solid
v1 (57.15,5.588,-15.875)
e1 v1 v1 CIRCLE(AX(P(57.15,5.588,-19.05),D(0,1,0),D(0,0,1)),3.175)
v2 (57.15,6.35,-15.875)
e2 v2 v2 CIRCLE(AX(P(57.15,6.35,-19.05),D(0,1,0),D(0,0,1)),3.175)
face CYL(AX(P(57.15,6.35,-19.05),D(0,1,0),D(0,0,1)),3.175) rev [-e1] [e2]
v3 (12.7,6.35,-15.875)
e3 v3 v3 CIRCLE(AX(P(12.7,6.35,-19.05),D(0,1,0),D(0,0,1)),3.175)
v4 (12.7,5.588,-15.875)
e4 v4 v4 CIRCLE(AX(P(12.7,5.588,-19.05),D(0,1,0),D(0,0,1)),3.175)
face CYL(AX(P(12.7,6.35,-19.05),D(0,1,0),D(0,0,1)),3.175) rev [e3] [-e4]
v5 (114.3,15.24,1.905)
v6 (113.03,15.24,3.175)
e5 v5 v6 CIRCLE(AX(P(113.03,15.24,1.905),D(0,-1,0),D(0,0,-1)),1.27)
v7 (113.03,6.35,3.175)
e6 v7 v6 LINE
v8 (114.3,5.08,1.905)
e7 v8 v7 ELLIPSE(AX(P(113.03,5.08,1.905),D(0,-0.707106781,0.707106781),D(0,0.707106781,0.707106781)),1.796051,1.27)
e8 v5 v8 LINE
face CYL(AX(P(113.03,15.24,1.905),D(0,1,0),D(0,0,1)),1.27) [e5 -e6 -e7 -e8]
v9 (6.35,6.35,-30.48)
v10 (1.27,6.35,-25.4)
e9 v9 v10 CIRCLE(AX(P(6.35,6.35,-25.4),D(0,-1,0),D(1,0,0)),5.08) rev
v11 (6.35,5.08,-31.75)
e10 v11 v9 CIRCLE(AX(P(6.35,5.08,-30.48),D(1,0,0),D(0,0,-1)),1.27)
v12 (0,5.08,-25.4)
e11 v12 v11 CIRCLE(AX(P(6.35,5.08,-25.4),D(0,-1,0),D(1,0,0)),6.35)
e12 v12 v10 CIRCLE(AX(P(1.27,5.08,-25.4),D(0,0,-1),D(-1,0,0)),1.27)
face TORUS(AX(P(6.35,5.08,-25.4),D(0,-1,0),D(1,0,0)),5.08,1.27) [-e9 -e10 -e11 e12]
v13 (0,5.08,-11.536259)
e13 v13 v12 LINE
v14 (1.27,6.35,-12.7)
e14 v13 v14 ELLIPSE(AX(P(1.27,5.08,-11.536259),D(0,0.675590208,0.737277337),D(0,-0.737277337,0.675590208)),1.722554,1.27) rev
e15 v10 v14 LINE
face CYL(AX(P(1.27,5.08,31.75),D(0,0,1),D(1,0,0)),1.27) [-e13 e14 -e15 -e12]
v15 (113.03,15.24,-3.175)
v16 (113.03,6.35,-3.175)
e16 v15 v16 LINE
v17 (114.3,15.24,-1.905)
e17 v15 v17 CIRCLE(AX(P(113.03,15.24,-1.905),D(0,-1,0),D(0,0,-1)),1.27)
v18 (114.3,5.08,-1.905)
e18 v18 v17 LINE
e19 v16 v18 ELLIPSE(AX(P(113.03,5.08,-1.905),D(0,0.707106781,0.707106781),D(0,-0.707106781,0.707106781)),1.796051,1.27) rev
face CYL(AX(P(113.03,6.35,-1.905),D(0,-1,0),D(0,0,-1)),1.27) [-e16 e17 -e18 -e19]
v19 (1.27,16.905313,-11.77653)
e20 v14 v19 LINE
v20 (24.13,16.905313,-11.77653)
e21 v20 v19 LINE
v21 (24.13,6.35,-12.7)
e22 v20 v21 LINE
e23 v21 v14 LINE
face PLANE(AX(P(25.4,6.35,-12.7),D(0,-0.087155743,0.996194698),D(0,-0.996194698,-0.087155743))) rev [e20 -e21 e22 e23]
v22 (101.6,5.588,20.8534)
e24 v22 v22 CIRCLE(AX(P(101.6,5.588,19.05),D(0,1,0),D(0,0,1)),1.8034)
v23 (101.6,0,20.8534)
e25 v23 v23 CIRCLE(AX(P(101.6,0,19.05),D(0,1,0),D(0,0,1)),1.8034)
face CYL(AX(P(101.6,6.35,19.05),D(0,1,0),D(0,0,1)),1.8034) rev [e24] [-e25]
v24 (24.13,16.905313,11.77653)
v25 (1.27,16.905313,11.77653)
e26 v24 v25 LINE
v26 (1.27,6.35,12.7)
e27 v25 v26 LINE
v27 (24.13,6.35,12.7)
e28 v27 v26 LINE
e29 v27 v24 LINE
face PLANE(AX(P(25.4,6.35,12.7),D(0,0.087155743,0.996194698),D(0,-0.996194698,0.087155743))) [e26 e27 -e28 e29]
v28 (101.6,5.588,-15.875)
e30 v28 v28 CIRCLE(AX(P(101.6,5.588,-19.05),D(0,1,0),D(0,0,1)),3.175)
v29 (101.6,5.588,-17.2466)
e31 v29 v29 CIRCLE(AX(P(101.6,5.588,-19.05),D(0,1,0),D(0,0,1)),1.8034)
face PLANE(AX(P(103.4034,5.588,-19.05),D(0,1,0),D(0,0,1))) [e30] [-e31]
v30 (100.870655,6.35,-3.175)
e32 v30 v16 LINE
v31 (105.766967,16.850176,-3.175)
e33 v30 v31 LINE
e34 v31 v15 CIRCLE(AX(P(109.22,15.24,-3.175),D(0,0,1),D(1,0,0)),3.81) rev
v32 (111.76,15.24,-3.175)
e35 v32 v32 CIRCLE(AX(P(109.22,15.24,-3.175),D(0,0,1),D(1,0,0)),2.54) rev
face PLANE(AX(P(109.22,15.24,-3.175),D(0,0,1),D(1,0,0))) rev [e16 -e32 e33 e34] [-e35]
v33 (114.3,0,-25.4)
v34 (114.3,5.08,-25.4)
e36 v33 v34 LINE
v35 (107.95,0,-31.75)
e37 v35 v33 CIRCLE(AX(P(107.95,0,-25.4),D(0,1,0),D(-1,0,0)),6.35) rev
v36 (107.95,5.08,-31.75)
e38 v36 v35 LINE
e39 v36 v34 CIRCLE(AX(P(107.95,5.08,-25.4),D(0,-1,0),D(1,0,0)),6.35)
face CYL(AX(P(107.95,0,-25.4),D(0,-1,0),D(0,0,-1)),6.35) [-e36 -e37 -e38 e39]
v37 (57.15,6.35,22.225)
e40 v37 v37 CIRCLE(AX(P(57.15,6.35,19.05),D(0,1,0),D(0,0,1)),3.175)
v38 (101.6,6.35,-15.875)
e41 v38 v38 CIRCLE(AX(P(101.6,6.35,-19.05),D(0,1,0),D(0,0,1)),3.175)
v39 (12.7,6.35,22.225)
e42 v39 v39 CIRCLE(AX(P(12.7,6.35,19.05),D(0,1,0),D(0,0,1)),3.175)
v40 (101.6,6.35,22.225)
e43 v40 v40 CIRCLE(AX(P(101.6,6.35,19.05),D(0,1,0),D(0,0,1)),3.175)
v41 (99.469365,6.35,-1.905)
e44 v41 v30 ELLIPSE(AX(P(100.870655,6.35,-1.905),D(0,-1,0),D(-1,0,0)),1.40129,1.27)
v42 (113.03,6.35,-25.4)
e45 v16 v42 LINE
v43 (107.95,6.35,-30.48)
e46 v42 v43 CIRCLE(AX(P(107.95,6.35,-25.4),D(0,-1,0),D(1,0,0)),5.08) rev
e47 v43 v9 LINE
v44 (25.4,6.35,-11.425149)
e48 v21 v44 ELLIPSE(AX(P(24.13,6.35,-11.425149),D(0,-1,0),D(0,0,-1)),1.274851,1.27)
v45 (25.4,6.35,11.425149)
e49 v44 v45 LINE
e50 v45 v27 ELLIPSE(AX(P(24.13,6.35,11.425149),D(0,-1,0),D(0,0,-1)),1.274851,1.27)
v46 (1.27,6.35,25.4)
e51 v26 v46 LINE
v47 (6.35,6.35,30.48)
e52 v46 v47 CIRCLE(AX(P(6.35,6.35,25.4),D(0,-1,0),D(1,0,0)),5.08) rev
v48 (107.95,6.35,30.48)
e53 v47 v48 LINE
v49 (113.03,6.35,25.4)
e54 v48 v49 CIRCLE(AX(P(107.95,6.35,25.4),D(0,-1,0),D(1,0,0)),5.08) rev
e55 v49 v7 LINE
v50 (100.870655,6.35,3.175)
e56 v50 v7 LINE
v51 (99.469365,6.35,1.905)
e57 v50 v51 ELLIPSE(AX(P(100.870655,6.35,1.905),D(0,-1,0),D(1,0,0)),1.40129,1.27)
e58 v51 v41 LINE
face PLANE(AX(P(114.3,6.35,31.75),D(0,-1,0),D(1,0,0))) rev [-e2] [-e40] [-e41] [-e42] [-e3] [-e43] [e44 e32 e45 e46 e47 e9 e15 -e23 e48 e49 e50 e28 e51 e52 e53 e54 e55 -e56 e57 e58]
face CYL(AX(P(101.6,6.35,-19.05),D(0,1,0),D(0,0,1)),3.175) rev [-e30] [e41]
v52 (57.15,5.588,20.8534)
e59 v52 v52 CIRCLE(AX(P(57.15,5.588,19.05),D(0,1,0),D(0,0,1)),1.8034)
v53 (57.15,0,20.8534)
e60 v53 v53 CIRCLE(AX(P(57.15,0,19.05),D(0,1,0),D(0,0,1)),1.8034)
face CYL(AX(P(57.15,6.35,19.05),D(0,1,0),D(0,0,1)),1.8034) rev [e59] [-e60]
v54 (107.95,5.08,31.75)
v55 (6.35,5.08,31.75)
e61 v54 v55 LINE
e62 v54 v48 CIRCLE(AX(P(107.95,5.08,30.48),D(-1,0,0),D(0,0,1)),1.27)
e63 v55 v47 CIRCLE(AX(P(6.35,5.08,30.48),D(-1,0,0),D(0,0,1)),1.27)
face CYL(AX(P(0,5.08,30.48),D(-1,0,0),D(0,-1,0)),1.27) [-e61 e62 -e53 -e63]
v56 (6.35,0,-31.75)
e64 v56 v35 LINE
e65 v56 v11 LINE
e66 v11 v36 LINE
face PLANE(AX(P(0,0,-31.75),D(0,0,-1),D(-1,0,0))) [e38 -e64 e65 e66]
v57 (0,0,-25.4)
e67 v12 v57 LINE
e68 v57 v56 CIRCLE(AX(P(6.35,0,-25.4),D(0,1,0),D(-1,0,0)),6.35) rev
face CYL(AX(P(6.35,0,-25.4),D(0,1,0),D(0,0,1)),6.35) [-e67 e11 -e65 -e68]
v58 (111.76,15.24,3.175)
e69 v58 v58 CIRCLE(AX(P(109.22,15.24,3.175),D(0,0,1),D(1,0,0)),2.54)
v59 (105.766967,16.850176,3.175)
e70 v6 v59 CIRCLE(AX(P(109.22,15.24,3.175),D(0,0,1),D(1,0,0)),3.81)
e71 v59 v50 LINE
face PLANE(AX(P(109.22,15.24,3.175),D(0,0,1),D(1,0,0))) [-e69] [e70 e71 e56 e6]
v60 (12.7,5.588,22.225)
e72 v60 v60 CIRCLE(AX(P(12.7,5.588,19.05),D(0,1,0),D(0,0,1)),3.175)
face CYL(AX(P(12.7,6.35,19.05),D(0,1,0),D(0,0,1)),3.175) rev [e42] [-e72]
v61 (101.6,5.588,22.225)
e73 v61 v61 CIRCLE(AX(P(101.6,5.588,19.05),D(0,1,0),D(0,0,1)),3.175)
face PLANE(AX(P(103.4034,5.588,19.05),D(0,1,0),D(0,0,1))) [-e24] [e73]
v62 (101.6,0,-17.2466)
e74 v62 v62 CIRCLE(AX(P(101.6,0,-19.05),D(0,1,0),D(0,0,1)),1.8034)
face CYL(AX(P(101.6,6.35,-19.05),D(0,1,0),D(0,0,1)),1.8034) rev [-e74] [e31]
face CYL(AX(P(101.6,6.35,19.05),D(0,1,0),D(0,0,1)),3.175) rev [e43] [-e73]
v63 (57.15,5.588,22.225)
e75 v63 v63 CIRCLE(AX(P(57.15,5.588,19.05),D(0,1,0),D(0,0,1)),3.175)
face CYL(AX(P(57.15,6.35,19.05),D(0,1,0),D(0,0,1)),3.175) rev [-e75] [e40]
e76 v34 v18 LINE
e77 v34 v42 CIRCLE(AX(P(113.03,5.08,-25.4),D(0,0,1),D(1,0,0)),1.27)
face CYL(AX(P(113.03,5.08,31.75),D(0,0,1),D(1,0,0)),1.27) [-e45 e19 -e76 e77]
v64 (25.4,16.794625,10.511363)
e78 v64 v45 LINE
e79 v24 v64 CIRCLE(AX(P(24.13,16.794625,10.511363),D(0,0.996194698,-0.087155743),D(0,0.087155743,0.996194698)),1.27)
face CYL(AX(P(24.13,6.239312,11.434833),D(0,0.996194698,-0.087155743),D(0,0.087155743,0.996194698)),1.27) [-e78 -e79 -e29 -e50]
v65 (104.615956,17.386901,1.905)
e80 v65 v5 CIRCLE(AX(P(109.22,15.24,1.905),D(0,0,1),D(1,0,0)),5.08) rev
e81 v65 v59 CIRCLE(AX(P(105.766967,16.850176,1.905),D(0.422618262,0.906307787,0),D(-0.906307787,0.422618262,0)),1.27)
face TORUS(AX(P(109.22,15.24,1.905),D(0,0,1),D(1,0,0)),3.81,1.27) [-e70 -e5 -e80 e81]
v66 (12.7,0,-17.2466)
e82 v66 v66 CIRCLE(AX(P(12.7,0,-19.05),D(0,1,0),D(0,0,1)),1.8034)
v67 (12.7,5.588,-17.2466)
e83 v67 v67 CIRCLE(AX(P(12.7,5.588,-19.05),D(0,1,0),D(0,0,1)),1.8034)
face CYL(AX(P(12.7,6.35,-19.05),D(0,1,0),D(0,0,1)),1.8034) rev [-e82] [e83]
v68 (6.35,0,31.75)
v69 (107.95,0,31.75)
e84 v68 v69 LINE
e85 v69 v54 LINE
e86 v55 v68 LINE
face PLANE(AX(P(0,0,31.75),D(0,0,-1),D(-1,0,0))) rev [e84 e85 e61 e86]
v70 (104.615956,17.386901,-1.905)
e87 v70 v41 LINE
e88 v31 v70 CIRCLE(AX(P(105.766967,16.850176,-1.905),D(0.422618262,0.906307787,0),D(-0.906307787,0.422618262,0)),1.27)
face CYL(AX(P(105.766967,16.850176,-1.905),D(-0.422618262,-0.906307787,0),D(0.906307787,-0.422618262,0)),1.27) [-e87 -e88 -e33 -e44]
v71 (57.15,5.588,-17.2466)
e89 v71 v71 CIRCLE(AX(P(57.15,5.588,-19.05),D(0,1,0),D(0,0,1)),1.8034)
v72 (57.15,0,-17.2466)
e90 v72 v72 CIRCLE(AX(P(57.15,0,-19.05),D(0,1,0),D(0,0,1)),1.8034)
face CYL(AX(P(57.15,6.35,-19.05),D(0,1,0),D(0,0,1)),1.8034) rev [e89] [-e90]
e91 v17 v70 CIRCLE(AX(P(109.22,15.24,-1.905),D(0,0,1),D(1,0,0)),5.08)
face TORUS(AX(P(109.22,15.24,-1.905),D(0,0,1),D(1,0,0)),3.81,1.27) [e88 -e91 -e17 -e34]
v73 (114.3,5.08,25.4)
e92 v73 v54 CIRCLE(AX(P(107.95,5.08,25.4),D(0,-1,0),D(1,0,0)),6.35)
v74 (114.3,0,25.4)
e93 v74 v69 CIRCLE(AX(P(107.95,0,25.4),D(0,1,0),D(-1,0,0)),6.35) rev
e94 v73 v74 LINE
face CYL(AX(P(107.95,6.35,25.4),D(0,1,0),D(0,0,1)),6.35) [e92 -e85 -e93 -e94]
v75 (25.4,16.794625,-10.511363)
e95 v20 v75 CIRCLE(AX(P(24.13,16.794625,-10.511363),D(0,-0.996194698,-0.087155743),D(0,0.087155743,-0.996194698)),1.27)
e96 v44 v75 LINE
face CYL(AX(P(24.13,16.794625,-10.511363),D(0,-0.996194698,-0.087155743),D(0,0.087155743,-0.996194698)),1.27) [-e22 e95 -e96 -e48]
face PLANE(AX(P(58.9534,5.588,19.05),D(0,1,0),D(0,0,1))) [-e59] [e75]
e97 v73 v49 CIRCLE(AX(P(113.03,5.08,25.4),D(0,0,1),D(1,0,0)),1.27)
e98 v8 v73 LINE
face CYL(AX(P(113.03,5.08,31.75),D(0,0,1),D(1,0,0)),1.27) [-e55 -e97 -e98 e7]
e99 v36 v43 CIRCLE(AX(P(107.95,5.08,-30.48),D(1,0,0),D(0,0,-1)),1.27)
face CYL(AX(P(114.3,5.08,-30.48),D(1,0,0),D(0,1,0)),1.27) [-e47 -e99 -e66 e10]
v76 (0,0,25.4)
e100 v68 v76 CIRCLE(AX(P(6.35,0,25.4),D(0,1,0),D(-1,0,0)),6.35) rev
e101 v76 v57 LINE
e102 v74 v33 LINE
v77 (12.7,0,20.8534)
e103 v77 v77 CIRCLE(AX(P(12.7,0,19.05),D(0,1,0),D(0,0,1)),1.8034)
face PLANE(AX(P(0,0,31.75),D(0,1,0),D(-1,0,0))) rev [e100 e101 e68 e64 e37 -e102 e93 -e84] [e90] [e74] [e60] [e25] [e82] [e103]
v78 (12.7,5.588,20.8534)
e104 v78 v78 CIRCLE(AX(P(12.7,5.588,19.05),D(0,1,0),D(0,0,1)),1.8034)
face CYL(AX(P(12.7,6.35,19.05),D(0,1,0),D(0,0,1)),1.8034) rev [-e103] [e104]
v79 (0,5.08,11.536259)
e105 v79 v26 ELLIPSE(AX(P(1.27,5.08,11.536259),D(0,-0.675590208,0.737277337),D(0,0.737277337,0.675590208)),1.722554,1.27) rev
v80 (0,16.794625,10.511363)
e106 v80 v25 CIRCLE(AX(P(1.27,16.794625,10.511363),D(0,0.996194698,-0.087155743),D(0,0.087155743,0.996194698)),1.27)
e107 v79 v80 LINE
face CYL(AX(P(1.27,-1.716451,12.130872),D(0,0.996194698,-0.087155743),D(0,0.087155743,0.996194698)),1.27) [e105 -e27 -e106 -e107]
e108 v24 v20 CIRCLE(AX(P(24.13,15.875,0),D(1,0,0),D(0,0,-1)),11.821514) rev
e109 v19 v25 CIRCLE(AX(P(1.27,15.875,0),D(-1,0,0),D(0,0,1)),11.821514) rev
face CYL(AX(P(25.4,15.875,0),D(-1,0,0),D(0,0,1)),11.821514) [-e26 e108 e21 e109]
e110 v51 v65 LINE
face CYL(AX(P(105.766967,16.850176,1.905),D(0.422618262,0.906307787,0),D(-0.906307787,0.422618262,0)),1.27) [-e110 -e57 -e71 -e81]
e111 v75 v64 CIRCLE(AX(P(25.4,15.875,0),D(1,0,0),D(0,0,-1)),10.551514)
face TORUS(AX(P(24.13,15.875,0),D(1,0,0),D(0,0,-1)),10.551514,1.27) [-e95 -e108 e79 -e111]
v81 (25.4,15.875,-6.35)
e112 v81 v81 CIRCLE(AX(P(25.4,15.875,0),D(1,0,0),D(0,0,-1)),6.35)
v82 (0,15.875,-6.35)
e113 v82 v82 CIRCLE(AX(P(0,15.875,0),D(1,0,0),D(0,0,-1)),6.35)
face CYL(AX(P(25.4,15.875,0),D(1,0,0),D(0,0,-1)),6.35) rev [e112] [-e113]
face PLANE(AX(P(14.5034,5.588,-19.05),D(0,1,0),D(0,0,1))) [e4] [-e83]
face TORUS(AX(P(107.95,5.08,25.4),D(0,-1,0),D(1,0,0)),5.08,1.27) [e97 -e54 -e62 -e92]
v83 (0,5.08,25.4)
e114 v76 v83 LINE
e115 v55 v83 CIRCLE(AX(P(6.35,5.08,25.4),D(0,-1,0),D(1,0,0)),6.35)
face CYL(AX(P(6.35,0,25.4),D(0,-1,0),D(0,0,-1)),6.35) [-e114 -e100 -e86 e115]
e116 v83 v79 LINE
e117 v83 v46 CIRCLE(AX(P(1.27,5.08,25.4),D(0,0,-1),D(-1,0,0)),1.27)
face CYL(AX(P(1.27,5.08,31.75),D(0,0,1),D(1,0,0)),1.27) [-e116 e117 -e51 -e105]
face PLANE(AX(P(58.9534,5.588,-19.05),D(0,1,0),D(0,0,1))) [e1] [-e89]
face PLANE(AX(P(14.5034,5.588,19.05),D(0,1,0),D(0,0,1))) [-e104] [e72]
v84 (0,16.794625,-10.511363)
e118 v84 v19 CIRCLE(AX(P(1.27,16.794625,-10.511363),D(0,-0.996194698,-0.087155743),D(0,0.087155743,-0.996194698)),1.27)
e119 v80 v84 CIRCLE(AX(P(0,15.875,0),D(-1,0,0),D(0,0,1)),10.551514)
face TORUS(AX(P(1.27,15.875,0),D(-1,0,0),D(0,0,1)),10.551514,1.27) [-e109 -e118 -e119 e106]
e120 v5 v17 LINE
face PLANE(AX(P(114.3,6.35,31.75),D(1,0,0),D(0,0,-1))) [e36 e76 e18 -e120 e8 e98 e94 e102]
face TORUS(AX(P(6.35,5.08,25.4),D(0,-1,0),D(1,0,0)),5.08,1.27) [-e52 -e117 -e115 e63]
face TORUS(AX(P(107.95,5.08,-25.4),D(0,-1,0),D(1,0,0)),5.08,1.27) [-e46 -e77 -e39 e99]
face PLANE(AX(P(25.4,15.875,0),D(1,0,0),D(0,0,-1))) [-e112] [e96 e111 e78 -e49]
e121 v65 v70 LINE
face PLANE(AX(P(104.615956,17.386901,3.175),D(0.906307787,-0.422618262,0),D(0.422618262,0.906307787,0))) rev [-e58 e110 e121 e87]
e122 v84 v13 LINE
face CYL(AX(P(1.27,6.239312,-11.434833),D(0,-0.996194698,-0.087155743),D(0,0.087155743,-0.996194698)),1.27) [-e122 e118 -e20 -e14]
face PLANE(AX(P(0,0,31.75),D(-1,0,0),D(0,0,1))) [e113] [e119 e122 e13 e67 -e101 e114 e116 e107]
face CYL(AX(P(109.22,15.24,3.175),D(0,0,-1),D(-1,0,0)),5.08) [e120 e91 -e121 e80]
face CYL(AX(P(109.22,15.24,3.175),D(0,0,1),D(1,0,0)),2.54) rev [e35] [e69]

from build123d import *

# Parameters (mm, degrees)
SKETCH1_W                      = 114.3
SKETCH1_H                      = 6.35
BASE_EXTRUDE_DEPTH             = 31.75
FILLET1_START                  = -3.175
FILLET1_DEPTH                  = 6.35
FILLET1_2_DEPTH                = 25.4
FILLET1_START_2                = -1
FILLET1_3_DEPTH                = 7.35
LEVER_BOSS_DEPTH               = 25.4
LEVER_BOSS_2_OUTLINE_W         = 6.35
LEVER_BOSS_2_OUTLINE_H         = 63.5
LEVER_BOSS_2_DEPTH             = 114.3
BOSS_EXTRUDE2_DEPTH            = 25.4
HOLE1_START                    = -1
HOLE1_DEPTH                    = 16.24
HOLE1_START_2                  = -3.175
HOLE1_2_OUTLINE_R              = 2.54
HOLE1_2_DEPTH                  = 6.35
HOLE2_D                        = 12.7
HOLE2_DEPTH                    = 25.4
F_4_SPOTFACE_HOLE1_D           = 3.6068
F_4_SPOTFACE_HOLE1_CBORE_D     = 6.35
F_4_SPOTFACE_HOLE1_CBORE_DEPTH = 0.762
LPATTERN1_COUNT                = 3
LPATTERN1_PITCH                = 44.45
LPATTERN1_COUNT_DIR2           = 2
LPATTERN1_PITCH_DIR2           = 38.1
FILLET2_R                      = 1.27


with BuildPart() as part:
    # Sketch1 → Base-Extrude (new, symmetric)
    with BuildSketch(Plane.XY):
        with Locations((57.15, 3.175)):
            Rectangle(SKETCH1_W, SKETCH1_H)
    extrude(amount=BASE_EXTRUDE_DEPTH, both=True)

    # Fillet1: read off the stored shape, not the designer's step
    # Fillet1 outline → Fillet1 (add)
    with BuildSketch(Plane.XY.offset(FILLET1_START)):
        with BuildLine():
            ThreePointArc((114.3, 15.24), (110.319513239, 20.199583716), (104.615956442, 17.38690077))
            Line((104.615956442, 17.38690077), (99.469365091, 6.35))
            Line((99.469365091, 6.35), (114.3, 6.35))
            Line((114.3, 6.35), (114.3, 15.24))
        make_face()
    extrude(amount=FILLET1_DEPTH)

    # Fillet1 2 outline → Fillet1 2 (add)
    with BuildSketch(Plane.YZ):
        with BuildLine():
            Line((6.35, -12.7), (16.905312852, -11.776529785))
            ThreePointArc((16.905312852, -11.776529785), (27.696514216, 0), (16.905312852, 11.776529785))
            Line((16.905312852, 11.776529785), (6.35, 12.7))
            Line((6.35, 12.7), (6.35, -12.7))
        make_face()
    extrude(amount=FILLET1_2_DEPTH)

    # Fillet1 3 outline → Fillet1 3 (cut)
    with BuildSketch(Plane(origin=(0, 0, 0), x_dir=(1, 0, 0), z_dir=(0, 1, 0)).offset(FILLET1_START_2)):
        with BuildLine():
            ThreePointArc((0, 25.4), (1.859871939, 29.890128061), (6.35, 31.75))
            Line((6.35, 31.75), (0, 31.75))
            Line((0, 31.75), (0, 25.4))
        make_face()
        with BuildLine():
            Line((114.3, 31.75), (107.95, 31.75))
            ThreePointArc((107.95, 31.75), (112.440128061, 29.890128061), (114.3, 25.4))
            Line((114.3, 25.4), (114.3, 31.75))
        make_face()
        with BuildLine():
            ThreePointArc((6.35, -31.75), (1.859871939, -29.890128061), (0, -25.4))
            Line((0, -25.4), (0, -31.75))
            Line((0, -31.75), (6.35, -31.75))
        make_face()
        with BuildLine():
            ThreePointArc((114.3, -25.4), (112.440128061, -29.890128061), (107.95, -31.75))
            Line((107.95, -31.75), (114.3, -31.75))
            Line((114.3, -31.75), (114.3, -25.4))
        make_face()
    extrude(amount=FILLET1_3_DEPTH, mode=Mode.SUBTRACT)

    # lever boss: read off the stored shape, not the designer's step
    # lever boss outline → lever boss (cut)
    with BuildSketch(Plane.YZ):
        with BuildLine():
            Line((16.905312852, 11.776529785), (6.35, 12.7))
            Line((6.35, 12.7), (6.35, -12.7))
            Line((6.35, -12.7), (16.905312852, -11.776529785))
            ThreePointArc((16.905312852, -11.776529785), (27.696514216, 0), (16.905312852, 11.776529785))
        make_face()
    extrude(amount=LEVER_BOSS_DEPTH, mode=Mode.SUBTRACT)

    # lever boss 2 outline → lever boss 2 (add)
    with BuildSketch(Plane.YZ):
        with Locations((3.175, 0)):
            Rectangle(LEVER_BOSS_2_OUTLINE_W, LEVER_BOSS_2_OUTLINE_H)
    extrude(amount=LEVER_BOSS_2_DEPTH)

    # Sketch3 → Boss-Extrude2 (add)
    with BuildSketch(Plane.ZY):
        with BuildLine():
            Line((12.7, 6.35), (11.776529785, 16.905312852))
            ThreePointArc((11.776529785, 16.905312852), (0, 27.696514216), (-11.776529785, 16.905312852))
            Line((-11.776529785, 16.905312852), (-12.7, 6.35))
            Line((-12.7, 6.35), (12.7, 6.35))
        make_face()
    extrude(amount=-BOSS_EXTRUDE2_DEPTH)

    # Hole1: read off the stored shape, not the designer's step
    # Hole1 outline → Hole1 (cut)
    with BuildSketch(Plane(origin=(0, 0, 0), x_dir=(1, 0, 0), z_dir=(0, 1, 0)).offset(HOLE1_START)):
        with BuildLine():
            ThreePointArc((0, 25.4), (1.859871939, 29.890128061), (6.35, 31.75))
            Line((6.35, 31.75), (0, 31.75))
            Line((0, 31.75), (0, 25.4))
        make_face()
        with BuildLine():
            Line((114.3, 31.75), (107.95, 31.75))
            ThreePointArc((107.95, 31.75), (112.440128061, 29.890128061), (114.3, 25.4))
            Line((114.3, 25.4), (114.3, 31.75))
        make_face()
        with BuildLine():
            ThreePointArc((6.35, -31.75), (1.859871939, -29.890128061), (0, -25.4))
            Line((0, -25.4), (0, -31.75))
            Line((0, -31.75), (6.35, -31.75))
        make_face()
        with BuildLine():
            ThreePointArc((114.3, -25.4), (112.440128061, -29.890128061), (107.95, -31.75))
            Line((107.95, -31.75), (114.3, -31.75))
            Line((114.3, -31.75), (114.3, -25.4))
        make_face()
    extrude(amount=HOLE1_DEPTH, mode=Mode.SUBTRACT)

    # Hole1 2 outline → Hole1 2 (cut)
    with BuildSketch(Plane.XY.offset(HOLE1_START_2)):
        with Locations((109.22, 15.24)):
            Circle(HOLE1_2_OUTLINE_R)
    extrude(amount=HOLE1_2_DEPTH, mode=Mode.SUBTRACT)

    # Hole2
    with Locations(Plane(origin=(25.4, 3.190032044, 95.175064019), x_dir=(0, 0, -1), z_dir=(1, 0, 0))):
        with Locations((95.175064019, 12.684967956)):
            Hole(HOLE2_D / 2, depth=HOLE2_DEPTH)

    # #4 spotface hole1 (through all)
    with Locations(Plane(origin=(72.288522493, 6.35, 6.630777087), x_dir=(-1, 0, 0), z_dir=(0, 1, 0))):
        with Locations((-29.311477507, 12.419222913)):
            f_4_spotface_hole1 = CounterBoreHole(F_4_SPOTFACE_HOLE1_D / 2, F_4_SPOTFACE_HOLE1_CBORE_D / 2, F_4_SPOTFACE_HOLE1_CBORE_DEPTH)

    # LPattern1: 4 spotface hole1 3 × 2
    with Locations(*[(-i * LPATTERN1_PITCH, 0, -j * LPATTERN1_PITCH_DIR2) for i in range(LPATTERN1_COUNT) for j in range(LPATTERN1_COUNT_DIR2) if (i, j) != (0, 0)]):
        add(f_4_spotface_hole1, mode=Mode.SUBTRACT)

    # Fillet2
    fillet2_edges = [part.edges().sort_by_distance(p)[0] for p in [
        (114.3, 6.35, -14.2875),
        (114.3, 10.795, -3.175),
        (110.319513239, 20.199583716, -3.175),
        (102.042660767, 11.868450385, -3.175),
        (114.3, 10.795, 3.175),
        (110.319513239, 20.199583716, 3.175),
        (102.042660767, 11.868450385, 3.175),
        (0, 6.35, -19.05),
        (0, 11.627656426, -12.238264893),
        (0, 27.696514216, 0),
        (25.4, 11.627656426, 12.238264893),
        (25.4, 11.627656426, -12.238264893),
        (25.4, 27.696514216, 0),
        (0, 11.627656426, 12.238264893),
        (57.15, 6.35, -31.75),
        (57.15, 6.35, 31.75),
        (112.440128061, 6.35, -29.890128061),
        (112.440128061, 6.35, 29.890128061),
        (1.859871939, 6.35, 29.890128061),
        (1.859871939, 6.35, -29.890128061),
    ]]
    fillet(fillet2_edges, radius=FILLET2_R)


solid = part.part
